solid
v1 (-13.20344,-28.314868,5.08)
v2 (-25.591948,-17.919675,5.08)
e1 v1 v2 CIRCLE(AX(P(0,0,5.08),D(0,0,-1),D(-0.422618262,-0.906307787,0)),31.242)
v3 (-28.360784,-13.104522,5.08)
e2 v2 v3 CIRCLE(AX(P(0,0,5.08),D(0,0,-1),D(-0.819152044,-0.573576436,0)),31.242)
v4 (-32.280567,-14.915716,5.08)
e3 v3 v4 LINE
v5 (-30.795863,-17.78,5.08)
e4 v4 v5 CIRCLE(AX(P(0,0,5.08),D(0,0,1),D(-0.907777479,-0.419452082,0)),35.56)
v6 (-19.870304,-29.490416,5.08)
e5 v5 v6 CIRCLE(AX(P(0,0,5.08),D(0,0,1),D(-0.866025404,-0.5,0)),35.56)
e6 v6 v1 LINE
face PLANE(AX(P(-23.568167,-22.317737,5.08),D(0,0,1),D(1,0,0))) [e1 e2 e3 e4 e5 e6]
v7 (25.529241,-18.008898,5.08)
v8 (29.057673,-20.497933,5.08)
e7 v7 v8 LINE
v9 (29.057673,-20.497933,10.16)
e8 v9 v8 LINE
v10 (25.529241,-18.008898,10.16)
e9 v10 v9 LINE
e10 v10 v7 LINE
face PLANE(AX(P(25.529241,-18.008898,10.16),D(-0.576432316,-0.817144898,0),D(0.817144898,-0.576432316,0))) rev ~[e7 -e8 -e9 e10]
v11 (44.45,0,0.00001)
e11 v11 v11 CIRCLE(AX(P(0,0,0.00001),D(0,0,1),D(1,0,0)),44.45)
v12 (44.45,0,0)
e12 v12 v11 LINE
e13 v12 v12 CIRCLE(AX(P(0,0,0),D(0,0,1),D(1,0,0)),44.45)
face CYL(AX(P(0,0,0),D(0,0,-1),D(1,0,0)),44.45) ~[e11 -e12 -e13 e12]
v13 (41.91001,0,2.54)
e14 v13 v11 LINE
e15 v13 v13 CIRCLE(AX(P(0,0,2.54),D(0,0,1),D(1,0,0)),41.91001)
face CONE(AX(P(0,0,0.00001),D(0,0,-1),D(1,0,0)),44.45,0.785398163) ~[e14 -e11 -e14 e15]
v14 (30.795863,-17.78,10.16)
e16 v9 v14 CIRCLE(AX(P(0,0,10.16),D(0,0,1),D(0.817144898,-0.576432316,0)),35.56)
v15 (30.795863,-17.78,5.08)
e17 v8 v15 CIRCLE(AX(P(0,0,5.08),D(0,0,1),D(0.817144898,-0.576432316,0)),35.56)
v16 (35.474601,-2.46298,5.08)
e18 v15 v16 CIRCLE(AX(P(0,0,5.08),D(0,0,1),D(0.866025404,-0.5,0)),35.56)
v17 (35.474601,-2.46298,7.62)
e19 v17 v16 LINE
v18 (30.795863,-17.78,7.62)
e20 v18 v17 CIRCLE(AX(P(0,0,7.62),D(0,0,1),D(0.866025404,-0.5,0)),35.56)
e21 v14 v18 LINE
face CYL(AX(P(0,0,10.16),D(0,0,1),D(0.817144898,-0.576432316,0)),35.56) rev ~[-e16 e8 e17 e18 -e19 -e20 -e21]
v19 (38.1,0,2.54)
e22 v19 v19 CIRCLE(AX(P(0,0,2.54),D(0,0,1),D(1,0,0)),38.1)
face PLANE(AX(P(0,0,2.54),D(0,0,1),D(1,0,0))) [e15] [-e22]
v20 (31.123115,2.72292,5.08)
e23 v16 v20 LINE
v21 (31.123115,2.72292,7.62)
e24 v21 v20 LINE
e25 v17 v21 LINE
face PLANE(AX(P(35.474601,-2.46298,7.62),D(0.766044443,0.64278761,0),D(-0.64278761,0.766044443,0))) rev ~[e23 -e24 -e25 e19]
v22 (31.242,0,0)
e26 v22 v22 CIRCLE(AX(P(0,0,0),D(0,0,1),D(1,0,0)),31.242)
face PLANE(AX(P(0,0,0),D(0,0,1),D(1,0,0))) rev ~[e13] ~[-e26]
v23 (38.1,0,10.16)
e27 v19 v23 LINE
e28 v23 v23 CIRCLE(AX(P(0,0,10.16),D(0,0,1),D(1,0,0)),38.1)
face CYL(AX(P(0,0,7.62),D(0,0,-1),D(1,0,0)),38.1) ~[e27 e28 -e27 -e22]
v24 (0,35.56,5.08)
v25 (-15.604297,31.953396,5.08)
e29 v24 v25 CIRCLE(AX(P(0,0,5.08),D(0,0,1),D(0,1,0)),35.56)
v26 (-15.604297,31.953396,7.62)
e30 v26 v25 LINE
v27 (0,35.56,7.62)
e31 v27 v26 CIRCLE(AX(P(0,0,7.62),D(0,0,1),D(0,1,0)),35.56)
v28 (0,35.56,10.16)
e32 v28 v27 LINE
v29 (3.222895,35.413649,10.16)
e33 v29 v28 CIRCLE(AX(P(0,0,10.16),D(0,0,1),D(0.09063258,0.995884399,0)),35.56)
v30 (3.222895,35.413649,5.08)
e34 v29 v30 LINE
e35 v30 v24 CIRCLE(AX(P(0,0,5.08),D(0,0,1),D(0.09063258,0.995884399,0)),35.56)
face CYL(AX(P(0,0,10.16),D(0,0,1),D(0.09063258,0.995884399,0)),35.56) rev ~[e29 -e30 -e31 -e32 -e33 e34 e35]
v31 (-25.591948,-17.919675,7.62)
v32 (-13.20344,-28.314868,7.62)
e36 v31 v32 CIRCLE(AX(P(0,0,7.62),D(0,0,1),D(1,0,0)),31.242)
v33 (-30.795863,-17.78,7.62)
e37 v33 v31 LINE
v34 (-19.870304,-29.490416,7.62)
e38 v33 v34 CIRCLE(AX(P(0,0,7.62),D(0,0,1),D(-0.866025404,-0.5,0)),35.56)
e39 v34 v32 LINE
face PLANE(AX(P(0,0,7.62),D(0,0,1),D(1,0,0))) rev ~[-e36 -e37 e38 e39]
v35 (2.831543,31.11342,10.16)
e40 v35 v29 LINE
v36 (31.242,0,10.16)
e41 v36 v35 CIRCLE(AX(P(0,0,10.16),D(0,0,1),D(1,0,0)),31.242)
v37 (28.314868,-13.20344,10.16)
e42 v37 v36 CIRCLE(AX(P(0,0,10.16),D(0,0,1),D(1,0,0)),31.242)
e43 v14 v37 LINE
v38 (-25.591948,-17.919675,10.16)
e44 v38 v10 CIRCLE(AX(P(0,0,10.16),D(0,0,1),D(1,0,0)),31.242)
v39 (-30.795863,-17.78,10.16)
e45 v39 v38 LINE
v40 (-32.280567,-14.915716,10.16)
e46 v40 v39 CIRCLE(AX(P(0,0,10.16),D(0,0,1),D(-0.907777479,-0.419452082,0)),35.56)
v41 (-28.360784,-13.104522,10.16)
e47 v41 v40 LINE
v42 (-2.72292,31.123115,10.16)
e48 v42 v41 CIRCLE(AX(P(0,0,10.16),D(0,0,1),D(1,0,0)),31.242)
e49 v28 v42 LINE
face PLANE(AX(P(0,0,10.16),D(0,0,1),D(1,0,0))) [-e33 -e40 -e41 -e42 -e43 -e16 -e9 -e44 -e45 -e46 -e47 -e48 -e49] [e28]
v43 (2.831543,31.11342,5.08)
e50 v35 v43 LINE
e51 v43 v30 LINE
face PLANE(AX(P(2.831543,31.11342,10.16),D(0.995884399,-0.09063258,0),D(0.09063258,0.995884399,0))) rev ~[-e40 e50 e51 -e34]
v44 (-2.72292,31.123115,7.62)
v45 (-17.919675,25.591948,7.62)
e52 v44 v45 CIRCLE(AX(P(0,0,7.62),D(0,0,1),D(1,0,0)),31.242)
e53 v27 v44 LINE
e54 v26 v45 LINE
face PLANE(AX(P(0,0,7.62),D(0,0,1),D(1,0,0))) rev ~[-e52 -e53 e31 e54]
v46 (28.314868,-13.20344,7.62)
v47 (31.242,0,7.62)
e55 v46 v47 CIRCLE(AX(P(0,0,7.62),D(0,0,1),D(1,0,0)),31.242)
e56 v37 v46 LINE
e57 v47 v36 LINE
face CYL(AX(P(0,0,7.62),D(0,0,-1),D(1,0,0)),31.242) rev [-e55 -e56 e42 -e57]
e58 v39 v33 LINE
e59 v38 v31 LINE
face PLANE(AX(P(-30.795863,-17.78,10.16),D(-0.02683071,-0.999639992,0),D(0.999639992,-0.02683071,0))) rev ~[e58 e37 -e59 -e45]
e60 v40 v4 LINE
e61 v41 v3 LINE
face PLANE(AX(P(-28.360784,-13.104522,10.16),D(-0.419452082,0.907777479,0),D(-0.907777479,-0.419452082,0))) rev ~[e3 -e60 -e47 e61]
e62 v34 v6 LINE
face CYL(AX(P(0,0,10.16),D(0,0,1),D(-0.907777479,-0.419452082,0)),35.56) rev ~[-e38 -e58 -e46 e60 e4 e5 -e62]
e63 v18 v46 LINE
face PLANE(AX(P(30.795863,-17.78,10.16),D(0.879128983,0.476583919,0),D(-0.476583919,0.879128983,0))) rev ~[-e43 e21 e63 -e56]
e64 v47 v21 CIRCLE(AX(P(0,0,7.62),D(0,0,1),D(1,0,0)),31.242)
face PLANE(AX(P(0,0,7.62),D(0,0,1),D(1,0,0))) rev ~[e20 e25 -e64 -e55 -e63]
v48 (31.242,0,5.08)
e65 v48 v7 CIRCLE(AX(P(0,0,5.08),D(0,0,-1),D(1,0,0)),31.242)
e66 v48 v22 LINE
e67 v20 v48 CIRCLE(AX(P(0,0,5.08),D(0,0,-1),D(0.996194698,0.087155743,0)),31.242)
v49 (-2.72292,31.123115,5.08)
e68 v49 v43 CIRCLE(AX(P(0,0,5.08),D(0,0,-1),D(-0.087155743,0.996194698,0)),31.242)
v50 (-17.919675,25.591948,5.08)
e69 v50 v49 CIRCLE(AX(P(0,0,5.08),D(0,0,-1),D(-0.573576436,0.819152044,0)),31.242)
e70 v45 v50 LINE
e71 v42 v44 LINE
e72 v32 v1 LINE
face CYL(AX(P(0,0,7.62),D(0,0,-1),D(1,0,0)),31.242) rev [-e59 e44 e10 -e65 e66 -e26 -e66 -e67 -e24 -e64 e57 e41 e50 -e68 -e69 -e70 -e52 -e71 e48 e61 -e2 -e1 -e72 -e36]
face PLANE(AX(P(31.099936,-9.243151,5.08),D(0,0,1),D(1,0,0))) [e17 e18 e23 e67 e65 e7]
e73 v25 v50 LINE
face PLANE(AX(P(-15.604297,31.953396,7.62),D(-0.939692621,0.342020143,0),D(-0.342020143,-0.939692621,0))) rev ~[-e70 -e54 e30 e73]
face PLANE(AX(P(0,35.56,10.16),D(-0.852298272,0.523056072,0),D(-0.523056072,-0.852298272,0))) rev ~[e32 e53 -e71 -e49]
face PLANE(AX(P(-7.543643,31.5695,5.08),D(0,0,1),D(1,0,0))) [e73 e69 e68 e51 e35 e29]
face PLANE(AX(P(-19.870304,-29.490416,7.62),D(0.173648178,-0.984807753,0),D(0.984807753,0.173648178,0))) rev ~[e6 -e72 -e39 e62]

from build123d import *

# Parameters (mm, degrees)
F0_R     = 44.45
F0_R_2   = 31.242
F1_DEPTH = 2.54
F2_R     = 38.1
F2_R_2   = 31.242
F3_DEPTH = 5.08
F5_DEPTH = 2.54
F6_R     = 38.1
F6_R_2   = 31.242
F7_DEPTH = 2.54
F9_DEPTH = 2.54
F10_SIZE = 2.53999


# Not quite as in the source:
# - a fillet or chamfer is up to 0.001 mm smaller than in the source, because OpenCascade refuses the exact size


with BuildPart() as f1:
    # F0 (on Top) → F1 (new body)
    with BuildSketch(Plane.XY):
        Circle(F0_R)
        Circle(F0_R_2, mode=Mode.SUBTRACT)
    extrude(amount=F1_DEPTH)

    # F2 (on face) → F3 (join)
    with BuildSketch(Plane.XY.offset(2.54)):
        Circle(F2_R)
        Circle(F2_R_2, mode=Mode.SUBTRACT)
    extrude(amount=F3_DEPTH)

    # F4 (on face) → F5 (cut)
    with BuildSketch(Plane.XY.offset(7.62)):
        with BuildLine():
            ThreePointArc((-25.5919481677, -17.9196750245), (-27.0835882302, -15.5737539654), (-28.3607839843, -13.1045219598))
            Line((-28.3607839843, -13.1045219598), (-32.2805671366, -14.9157160518))
            ThreePointArc((-32.2805671366, -14.9157160518), (-31.5707150955, -16.3647043469), (-30.7958633586, -17.78))
            ThreePointArc((-30.7958633586, -17.78), (-26.0009342584, -24.2582979142), (-19.8703037457, -29.4904158847))
            Line((-19.8703037457, -29.4904158847), (-13.2034397333, -28.3148678826))
            ThreePointArc((-13.2034397333, -28.3148678826), (-20.0819705018, -23.9327604919), (-25.5919481677, -17.9196750245))
        make_face()
        with BuildLine():
            ThreePointArc((-17.9196750245, 25.5919481677), (-10.6853933178, 29.3578768586), (-2.7229197149, 31.1231147578))
            ThreePointArc((-2.7229197149, 31.1231147578), (0.0545275488, 31.2419524157), (2.8315430705, 31.1134203816))
            Line((2.8315430705, 31.1134203816), (3.2228945518, 35.4136492148))
            ThreePointArc((3.2228945518, 35.4136492148), (1.6131078579, 35.5233934618), (0, 35.56))
            ThreePointArc((0, 35.56), (-8.007835117, 34.646618547), (-15.6042974515, 31.9533957671))
            Line((-15.6042974515, 31.9533957671), (-17.9196750245, 25.5919481677))
        make_face()
        with BuildLine():
            Line((35.4746011972, -2.4629798824), (31.1231147578, 2.7229197149))
            ThreePointArc((31.1231147578, 2.7229197149), (31.2122645387, 1.3627569001), (31.242, 0))
            ThreePointArc((31.242, 0), (29.7795828432, -9.4466401268), (25.5292409138, -18.0088984218))
            Line((25.5292409138, -18.0088984218), (29.0576725848, -20.497933163))
            ThreePointArc((29.0576725848, -20.497933163), (29.9576072376, -19.1586891148), (30.7958633586, -17.78))
            ThreePointArc((30.7958633586, -17.78), (34.0087693754, -10.3883206328), (35.4746011972, -2.4629798824))
        make_face()
    extrude(amount=-F5_DEPTH, mode=Mode.SUBTRACT)

    # F6 (on face) → F7 (join)
    with BuildSketch(Plane.XY.offset(7.62)):
        Circle(F6_R)
        Circle(F6_R_2, mode=Mode.SUBTRACT)
    extrude(amount=F7_DEPTH)

    # F8 (on face) → F9 (cut)
    with BuildSketch(Plane.XY.offset(10.16)):
        with BuildLine():
            ThreePointArc((-25.5919481677, -17.9196750245), (-27.0835882302, -15.5737539654), (-28.3607839843, -13.1045219598))
            Line((-28.3607839843, -13.1045219598), (-32.2805671366, -14.9157160518))
            ThreePointArc((-32.2805671366, -14.9157160518), (-31.5707150955, -16.3647043469), (-30.7958633586, -17.78))
            Line((-30.7958633586, -17.78), (-25.5919481677, -17.9196750245))
        make_face()
        with BuildLine():
            ThreePointArc((28.3148678826, -13.2034397333), (27.0290606814, -15.6681984503), (25.5292409138, -18.0088984218))
            Line((25.5292409138, -18.0088984218), (29.0576725848, -20.497933163))
            ThreePointArc((29.0576725848, -20.497933163), (29.9576072376, -19.1586891148), (30.7958633586, -17.78))
            Line((30.7958633586, -17.78), (28.3148678826, -13.2034397333))
        make_face()
        with BuildLine():
            Line((0, 35.56), (-2.7229197149, 31.1231147578))
            ThreePointArc((-2.7229197149, 31.1231147578), (0.0545275488, 31.2419524157), (2.8315430705, 31.1134203816))
            Line((2.8315430705, 31.1134203816), (3.2228945518, 35.4136492148))
            ThreePointArc((3.2228945518, 35.4136492148), (1.6131078579, 35.5233934618), (0, 35.56))
        make_face()
    extrude(amount=-F9_DEPTH, mode=Mode.SUBTRACT)

    # F10 (size 2.54 in the source; OpenCascade refuses exactly that, so slightly less here)
    f10_edges = [f1.edges().sort_by_distance(p)[0] for p in [
        (-44.45, 0, 2.54),
    ]]
    chamfer(f10_edges, length=F10_SIZE)


solid = f1.part
